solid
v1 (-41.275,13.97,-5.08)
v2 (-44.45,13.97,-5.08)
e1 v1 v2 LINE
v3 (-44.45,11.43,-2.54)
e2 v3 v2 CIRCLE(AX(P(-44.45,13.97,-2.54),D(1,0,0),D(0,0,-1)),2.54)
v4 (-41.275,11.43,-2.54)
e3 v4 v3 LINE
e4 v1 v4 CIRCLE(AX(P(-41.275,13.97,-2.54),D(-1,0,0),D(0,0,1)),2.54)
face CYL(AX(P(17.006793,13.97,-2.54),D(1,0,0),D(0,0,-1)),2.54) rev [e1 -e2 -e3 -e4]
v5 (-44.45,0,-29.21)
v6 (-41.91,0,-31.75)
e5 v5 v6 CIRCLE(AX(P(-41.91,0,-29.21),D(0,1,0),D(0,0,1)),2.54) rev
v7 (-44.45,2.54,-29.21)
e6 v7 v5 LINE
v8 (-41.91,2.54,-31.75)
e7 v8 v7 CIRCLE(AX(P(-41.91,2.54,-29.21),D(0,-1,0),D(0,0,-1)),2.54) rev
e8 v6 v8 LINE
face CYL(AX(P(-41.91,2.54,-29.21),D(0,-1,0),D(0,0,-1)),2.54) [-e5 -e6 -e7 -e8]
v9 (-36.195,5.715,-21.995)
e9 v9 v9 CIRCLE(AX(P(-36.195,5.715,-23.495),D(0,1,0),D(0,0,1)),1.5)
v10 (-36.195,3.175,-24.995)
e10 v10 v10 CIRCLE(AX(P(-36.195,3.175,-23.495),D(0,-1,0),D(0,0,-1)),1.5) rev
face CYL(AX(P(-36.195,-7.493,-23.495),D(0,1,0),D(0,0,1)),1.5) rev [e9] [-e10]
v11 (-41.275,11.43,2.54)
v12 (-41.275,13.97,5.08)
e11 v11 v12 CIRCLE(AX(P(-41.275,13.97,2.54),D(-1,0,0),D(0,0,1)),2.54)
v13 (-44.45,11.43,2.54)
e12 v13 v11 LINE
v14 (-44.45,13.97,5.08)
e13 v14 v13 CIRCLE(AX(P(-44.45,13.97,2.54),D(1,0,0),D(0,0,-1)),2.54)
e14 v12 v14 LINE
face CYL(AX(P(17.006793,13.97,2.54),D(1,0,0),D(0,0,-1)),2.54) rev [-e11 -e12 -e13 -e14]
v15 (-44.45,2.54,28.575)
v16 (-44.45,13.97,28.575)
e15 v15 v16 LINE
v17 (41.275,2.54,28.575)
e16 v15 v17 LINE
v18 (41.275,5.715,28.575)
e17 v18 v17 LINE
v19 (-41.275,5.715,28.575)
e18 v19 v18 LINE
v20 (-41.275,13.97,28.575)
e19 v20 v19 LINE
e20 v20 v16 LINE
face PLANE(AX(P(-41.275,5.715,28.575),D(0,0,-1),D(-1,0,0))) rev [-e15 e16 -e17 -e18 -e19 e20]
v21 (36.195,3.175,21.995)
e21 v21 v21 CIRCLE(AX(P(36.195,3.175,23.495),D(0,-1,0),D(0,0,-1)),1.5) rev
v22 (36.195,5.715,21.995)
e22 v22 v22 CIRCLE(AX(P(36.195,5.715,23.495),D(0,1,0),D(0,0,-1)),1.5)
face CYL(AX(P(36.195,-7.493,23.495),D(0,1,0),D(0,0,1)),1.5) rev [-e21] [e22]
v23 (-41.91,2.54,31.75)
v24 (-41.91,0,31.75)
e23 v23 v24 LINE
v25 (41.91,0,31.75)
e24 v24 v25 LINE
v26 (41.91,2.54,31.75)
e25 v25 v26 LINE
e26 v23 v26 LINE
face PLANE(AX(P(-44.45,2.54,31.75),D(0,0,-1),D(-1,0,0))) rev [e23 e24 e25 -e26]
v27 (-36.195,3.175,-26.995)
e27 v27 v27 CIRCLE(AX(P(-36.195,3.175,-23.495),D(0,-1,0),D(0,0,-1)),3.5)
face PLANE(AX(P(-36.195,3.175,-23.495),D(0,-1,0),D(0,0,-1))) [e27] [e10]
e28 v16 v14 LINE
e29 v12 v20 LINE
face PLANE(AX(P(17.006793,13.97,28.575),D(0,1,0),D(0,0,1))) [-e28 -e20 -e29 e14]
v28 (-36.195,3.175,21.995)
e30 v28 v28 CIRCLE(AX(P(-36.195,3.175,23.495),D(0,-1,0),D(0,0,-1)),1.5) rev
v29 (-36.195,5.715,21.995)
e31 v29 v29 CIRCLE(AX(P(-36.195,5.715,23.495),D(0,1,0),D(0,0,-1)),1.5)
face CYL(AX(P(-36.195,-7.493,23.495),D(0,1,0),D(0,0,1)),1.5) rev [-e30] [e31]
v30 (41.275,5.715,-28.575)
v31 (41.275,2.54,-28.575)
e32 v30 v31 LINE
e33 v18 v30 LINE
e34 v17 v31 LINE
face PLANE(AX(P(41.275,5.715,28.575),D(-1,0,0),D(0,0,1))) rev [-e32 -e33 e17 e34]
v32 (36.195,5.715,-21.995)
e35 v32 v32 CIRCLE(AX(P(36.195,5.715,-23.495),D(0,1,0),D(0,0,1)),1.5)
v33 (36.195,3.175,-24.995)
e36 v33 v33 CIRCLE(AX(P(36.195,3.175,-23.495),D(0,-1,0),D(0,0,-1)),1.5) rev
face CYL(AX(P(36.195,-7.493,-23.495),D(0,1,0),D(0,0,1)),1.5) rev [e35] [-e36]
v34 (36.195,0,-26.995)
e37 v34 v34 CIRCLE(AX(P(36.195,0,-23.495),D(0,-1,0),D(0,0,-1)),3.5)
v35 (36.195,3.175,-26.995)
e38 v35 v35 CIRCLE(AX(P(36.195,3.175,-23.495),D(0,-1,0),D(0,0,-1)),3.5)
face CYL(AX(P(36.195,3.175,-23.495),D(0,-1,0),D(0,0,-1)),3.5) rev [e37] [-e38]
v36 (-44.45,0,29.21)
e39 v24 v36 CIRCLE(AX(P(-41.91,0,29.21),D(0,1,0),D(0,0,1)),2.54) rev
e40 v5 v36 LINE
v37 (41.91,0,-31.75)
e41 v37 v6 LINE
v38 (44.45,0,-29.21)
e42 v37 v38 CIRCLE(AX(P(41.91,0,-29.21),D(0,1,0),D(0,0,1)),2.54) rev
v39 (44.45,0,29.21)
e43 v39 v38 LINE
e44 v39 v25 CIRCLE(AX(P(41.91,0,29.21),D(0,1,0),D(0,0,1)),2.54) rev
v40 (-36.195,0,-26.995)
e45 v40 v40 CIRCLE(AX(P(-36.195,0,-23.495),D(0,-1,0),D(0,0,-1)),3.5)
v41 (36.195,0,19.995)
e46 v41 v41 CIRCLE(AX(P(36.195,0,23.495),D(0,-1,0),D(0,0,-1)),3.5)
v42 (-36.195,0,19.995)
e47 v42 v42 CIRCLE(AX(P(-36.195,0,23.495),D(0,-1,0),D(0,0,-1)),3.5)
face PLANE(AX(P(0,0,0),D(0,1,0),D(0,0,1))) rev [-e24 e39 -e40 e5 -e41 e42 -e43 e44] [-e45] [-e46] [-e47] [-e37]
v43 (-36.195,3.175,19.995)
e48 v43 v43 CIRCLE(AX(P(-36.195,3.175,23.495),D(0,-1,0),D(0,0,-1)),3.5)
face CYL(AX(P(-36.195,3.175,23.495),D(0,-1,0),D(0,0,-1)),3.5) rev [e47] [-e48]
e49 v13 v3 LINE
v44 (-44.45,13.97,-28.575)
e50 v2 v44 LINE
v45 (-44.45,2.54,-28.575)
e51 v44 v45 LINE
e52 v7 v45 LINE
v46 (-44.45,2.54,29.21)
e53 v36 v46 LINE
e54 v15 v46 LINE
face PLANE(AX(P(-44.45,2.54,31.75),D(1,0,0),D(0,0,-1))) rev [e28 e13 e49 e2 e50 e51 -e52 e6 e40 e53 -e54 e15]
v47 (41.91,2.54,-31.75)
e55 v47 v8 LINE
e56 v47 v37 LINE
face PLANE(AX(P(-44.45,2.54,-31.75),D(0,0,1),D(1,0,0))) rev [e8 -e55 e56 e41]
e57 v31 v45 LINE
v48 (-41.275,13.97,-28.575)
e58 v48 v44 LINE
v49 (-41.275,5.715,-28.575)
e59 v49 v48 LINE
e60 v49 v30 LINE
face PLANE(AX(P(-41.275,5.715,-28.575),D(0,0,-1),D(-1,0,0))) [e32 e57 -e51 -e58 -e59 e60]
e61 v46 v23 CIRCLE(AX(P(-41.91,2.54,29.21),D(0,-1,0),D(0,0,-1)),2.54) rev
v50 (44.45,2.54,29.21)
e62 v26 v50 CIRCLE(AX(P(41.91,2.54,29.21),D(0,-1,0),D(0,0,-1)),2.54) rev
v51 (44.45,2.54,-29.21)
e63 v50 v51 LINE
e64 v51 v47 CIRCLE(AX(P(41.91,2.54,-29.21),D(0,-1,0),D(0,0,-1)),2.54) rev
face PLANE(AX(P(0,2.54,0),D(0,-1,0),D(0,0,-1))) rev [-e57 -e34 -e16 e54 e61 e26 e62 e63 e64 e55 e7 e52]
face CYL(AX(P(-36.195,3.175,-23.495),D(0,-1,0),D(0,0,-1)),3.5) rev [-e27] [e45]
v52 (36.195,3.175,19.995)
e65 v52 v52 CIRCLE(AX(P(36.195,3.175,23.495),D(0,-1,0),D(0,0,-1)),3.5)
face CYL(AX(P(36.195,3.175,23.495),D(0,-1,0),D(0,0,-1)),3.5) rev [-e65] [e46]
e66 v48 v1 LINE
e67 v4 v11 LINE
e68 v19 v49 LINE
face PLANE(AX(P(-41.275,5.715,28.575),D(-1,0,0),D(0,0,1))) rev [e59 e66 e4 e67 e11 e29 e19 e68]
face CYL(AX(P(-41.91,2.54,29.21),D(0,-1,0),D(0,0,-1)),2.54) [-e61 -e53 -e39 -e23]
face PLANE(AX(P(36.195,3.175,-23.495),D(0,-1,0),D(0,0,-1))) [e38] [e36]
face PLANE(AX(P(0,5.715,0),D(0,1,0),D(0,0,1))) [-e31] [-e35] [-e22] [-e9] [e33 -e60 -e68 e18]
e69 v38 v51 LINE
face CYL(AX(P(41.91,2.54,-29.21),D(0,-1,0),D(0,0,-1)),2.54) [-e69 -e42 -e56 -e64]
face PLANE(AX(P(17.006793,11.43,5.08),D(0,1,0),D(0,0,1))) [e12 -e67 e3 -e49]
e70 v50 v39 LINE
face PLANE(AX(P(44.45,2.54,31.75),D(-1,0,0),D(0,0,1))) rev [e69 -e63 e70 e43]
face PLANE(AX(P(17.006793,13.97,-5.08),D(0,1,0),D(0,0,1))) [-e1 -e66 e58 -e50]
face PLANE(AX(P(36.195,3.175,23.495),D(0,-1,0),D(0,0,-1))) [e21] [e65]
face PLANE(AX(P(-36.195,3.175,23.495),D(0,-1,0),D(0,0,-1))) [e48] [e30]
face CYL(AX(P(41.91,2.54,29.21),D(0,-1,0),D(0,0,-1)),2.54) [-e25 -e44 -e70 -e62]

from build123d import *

# Parameters (mm, degrees)
SKETCH1_W           = 82.55
SKETCH1_H           = 57.15
BOSS_EXTRUDE2_DEPTH = 5.715
SKETCH1_7_W         = 88.9
SKETCH1_7_H         = 63.5
SKETCH1_7_W_2       = 82.55
SKETCH1_7_H_2       = 57.15
TOP_DEPTH           = 2.54
FRONTLIP_DEPTH      = 3.175
SKETCH4_R           = 1.5
M3SCREWHOLE_DEPTH   = 13.208
FILLET1_R           = 2.54
SKETCH5_R           = 3.5
SCREWHEADHOLE_DEPTH = 3.175


with BuildPart() as part:
    # Sketch1 → Boss-Extrude2 (new body)
    with BuildSketch(Plane(origin=(0, 0, 0), x_dir=(1, 0, 0), z_dir=(0, 1, 0))):
        Rectangle(SKETCH1_W, SKETCH1_H)
    extrude(amount=BOSS_EXTRUDE2_DEPTH)

    # Sketch1<7> → Top (add)
    with BuildSketch(Plane(origin=(0, 0, 0), x_dir=(1, 0, 0), z_dir=(0, 1, 0))):
        Rectangle(SKETCH1_7_W, SKETCH1_7_H)
        Rectangle(SKETCH1_7_W_2, SKETCH1_7_H_2, mode=Mode.SUBTRACT)
    extrude(amount=TOP_DEPTH)

    # Sketch3 → FrontLip (add)
    with BuildSketch(Plane.ZY.offset(44.45)):
        Polygon((-28.575, 2.54), (28.575, 2.54), (28.575, 13.97), (5.08, 13.97), (5.08, 11.43), (-5.08, 11.43), (-5.08, 13.97), (-28.575, 13.97), align=None)
    extrude(amount=-FRONTLIP_DEPTH)

    # Sketch4 → M3ScrewHole (cut)
    with BuildSketch(Plane(origin=(0, 5.715, 0), x_dir=(1, 0, 0), z_dir=(0, 1, 0))):
        with Locations(Location((-36.195, 23.495, 0), (0, 0, 270))):
            Circle(SKETCH4_R)
        with Locations(Location((36.195, 23.495, 0), (0, 0, 270))):
            Circle(SKETCH4_R)
        with Locations(Location((36.195, -23.495, 0), (0, 0, 270))):
            Circle(SKETCH4_R)
        with Locations(Location((-36.195, -23.495, 0), (0, 0, 270))):
            Circle(SKETCH4_R)
    extrude(amount=-M3SCREWHOLE_DEPTH, mode=Mode.SUBTRACT)

    # Fillet1
    fillet1_edges = [part.edges().sort_by_distance(p)[0] for p in [
        (-42.8625, 11.43, -5.08),
        (-42.8625, 11.43, 5.08),
        (44.45, 1.27, 31.75),
        (44.45, 1.27, -31.75),
        (-44.45, 1.27, 31.75),
        (-44.45, 1.27, -31.75),
    ]]
    fillet(fillet1_edges, radius=FILLET1_R - 0.0001)  # a hair under: the kernel refuses the full size

    # Sketch5 → ScrewHeadHole (cut)
    with BuildSketch(Plane.XZ):
        with Locations(Location((-36.195, 23.495, 0), (0, 0, 270))):
            Circle(SKETCH5_R)
        with Locations(Location((-36.195, -23.495, 0), (0, 0, 270))):
            Circle(SKETCH5_R)
        with Locations(Location((36.195, -23.495, 0), (0, 0, 270))):
            Circle(SKETCH5_R)
        with Locations(Location((36.195, 23.495, 0), (0, 0, 270))):
            Circle(SKETCH5_R)
    extrude(amount=-SCREWHEADHOLE_DEPTH, mode=Mode.SUBTRACT)


solid = part.part
